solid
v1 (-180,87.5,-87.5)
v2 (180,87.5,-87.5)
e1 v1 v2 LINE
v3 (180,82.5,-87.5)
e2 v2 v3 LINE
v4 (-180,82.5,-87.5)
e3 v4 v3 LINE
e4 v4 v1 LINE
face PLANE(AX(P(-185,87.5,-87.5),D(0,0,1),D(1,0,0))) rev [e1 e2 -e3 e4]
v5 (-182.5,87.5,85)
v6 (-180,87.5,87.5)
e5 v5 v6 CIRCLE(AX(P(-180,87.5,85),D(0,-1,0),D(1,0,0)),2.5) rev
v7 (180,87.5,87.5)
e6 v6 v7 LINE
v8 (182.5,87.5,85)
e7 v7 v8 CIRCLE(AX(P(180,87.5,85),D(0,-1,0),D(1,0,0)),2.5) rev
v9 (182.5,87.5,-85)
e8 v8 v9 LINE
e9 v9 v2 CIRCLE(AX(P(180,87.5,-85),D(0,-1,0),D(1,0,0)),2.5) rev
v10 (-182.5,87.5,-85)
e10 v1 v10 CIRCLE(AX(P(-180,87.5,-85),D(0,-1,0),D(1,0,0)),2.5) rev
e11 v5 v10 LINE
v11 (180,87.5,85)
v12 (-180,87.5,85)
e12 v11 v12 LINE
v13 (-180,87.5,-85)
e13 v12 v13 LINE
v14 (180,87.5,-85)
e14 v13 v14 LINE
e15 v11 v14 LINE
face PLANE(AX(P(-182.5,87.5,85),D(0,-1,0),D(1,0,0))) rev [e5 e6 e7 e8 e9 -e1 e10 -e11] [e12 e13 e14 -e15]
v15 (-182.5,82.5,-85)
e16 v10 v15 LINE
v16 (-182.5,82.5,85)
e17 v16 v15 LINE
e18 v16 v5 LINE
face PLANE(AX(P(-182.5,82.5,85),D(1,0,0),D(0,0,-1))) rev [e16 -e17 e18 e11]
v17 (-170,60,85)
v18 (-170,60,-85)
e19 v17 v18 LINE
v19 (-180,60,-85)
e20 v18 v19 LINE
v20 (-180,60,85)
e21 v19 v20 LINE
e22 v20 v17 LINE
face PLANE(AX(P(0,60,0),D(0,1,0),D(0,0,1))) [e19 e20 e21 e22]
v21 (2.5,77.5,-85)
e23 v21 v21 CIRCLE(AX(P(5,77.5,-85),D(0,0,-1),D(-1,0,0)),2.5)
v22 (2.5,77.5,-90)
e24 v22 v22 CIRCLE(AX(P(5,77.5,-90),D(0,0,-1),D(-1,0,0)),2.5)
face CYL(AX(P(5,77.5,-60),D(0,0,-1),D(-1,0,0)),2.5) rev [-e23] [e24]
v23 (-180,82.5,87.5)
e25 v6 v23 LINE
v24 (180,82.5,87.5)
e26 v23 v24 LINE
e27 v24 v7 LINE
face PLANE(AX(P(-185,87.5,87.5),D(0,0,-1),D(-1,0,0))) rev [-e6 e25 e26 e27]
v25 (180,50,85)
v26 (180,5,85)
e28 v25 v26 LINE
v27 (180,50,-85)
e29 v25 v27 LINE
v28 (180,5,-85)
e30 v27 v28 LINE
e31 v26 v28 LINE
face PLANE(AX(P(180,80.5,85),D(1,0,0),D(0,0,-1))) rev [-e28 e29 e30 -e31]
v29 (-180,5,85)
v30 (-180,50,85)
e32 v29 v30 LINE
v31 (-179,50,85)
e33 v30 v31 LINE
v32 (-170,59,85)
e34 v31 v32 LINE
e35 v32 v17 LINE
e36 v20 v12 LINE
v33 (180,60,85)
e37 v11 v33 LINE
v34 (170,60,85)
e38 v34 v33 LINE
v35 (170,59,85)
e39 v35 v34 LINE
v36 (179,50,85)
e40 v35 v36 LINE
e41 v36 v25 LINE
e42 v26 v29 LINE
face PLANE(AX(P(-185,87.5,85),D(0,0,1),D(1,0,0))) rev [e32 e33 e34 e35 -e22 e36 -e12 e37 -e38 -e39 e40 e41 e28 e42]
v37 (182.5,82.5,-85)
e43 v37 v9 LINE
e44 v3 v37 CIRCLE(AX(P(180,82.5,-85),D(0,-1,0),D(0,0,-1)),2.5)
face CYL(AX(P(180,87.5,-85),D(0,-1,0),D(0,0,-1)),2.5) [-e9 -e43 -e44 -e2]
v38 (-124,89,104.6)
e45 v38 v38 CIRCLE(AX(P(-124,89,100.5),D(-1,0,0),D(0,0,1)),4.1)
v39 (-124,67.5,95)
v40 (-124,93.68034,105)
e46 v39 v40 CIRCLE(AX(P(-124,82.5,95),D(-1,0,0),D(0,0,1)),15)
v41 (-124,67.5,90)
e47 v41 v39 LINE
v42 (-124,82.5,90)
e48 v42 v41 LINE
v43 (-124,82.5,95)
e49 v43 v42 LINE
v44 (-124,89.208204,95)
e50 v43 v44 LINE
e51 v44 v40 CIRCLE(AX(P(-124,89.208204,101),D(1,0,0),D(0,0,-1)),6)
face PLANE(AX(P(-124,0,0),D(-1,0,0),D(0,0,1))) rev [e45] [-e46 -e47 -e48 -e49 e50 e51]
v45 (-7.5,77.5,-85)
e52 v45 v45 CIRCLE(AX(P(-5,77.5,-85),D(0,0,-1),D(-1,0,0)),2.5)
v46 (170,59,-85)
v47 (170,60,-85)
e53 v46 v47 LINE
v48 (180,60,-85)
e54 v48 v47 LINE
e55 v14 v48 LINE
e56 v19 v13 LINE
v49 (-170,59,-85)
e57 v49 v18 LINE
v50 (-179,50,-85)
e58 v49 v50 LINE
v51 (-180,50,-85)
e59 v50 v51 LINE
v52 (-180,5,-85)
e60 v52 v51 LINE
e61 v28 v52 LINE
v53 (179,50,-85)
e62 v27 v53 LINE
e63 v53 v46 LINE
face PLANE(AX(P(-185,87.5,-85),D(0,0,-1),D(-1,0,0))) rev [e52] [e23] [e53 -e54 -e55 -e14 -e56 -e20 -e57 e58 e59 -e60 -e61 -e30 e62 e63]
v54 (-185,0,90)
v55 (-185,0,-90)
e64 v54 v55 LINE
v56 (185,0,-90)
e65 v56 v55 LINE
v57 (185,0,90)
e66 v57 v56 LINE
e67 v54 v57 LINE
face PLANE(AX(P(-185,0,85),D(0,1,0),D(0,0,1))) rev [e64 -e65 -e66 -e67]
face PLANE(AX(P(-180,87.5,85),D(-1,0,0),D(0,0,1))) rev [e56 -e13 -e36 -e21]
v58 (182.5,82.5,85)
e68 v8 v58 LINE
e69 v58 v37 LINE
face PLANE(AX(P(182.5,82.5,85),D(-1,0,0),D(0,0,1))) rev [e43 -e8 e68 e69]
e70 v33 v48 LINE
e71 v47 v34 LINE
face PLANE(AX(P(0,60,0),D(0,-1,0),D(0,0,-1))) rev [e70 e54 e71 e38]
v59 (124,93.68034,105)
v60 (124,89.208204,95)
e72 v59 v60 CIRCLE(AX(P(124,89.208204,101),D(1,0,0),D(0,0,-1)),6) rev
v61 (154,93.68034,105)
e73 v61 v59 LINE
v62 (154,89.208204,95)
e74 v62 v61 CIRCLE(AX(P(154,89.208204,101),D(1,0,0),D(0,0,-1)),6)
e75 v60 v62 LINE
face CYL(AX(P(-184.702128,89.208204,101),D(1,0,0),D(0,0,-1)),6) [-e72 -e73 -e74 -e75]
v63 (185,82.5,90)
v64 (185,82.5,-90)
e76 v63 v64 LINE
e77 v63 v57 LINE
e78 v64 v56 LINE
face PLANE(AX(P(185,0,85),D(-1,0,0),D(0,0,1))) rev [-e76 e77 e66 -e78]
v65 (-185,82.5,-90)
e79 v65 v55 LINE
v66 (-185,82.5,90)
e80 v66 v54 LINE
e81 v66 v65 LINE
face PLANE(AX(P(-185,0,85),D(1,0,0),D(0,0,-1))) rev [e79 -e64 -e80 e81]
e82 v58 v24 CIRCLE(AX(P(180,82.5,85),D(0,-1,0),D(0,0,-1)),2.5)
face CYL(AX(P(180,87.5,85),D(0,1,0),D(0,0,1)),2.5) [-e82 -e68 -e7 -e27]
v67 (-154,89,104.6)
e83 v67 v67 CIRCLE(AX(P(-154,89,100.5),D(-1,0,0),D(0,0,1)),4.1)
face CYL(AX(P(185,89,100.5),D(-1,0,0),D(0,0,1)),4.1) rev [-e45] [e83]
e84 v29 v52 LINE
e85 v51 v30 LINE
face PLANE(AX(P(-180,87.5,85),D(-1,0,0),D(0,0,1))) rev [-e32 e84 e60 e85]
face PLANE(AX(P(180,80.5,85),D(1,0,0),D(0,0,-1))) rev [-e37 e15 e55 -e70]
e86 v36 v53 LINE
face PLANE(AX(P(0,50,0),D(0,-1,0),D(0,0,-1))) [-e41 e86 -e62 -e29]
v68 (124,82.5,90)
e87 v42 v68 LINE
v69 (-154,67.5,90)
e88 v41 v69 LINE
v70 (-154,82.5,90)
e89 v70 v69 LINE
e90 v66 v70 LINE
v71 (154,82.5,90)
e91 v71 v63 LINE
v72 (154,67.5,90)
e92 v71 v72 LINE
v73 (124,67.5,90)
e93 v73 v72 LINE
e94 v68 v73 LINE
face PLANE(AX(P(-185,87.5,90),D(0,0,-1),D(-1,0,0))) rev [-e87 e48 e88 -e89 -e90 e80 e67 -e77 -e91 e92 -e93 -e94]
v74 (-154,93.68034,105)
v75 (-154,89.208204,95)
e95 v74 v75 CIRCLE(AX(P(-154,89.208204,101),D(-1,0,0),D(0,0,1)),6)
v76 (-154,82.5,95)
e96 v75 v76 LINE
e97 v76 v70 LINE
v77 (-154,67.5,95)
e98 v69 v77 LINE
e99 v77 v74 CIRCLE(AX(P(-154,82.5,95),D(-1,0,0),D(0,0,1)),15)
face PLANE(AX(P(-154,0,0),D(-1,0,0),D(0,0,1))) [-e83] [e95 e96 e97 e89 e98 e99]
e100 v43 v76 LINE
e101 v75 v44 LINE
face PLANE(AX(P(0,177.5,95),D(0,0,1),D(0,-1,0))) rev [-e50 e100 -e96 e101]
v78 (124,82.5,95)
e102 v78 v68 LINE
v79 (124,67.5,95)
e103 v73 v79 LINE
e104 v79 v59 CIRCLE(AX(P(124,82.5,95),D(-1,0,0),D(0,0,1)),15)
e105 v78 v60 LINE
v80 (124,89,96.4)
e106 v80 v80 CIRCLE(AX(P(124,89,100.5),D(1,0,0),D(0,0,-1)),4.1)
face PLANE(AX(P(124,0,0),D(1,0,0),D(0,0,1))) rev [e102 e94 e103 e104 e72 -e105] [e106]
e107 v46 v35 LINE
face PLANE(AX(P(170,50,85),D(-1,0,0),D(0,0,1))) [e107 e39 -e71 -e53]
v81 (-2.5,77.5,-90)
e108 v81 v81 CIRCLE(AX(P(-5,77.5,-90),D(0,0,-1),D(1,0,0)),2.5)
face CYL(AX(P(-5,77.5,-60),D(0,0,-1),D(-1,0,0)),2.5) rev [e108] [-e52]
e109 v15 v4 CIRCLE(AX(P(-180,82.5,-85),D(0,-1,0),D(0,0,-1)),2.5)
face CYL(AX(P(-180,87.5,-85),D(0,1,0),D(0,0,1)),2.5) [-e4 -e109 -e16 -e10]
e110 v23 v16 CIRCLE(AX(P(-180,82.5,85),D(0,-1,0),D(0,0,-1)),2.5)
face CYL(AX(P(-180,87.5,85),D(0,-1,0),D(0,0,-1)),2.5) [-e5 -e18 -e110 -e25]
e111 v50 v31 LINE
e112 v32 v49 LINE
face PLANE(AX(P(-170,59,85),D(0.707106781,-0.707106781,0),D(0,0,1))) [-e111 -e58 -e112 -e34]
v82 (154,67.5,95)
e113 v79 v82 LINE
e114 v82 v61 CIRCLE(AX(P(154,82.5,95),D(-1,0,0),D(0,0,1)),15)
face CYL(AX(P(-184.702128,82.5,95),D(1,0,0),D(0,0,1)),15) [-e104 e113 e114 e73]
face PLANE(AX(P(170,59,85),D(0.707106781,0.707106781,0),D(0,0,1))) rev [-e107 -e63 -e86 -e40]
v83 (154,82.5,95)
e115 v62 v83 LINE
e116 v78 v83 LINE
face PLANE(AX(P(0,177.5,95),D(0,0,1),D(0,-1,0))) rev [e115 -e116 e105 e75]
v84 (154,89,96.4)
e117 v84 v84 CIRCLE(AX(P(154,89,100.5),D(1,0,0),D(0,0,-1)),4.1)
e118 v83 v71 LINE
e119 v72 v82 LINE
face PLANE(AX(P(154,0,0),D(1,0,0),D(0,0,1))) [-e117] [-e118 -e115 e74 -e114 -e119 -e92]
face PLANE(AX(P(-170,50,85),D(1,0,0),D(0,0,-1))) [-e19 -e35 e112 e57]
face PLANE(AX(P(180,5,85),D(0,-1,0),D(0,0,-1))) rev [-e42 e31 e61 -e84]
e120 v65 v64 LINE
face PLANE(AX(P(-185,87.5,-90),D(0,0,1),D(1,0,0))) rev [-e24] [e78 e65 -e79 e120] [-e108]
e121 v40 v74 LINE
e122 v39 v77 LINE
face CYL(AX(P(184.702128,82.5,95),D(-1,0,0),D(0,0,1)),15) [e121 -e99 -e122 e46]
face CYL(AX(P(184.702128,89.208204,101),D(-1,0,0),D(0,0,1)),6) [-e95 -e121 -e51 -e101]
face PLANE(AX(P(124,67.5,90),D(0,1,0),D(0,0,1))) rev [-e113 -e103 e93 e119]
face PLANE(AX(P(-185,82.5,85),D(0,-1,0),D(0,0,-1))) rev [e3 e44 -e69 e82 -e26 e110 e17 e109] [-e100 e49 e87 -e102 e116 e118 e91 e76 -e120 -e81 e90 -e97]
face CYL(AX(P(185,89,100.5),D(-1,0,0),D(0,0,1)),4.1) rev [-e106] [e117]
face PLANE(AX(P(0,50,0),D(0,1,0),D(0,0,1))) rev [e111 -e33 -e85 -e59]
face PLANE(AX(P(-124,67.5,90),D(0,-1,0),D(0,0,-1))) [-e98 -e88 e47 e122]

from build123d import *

# Parameters (mm, degrees)
BOSS_EXTRUDE1_DEPTH     = 85
SKETCH3_W               = 370
SKETCH3_H               = 5
BOSS_EXTRUDE2_DEPTH     = 87.5
SKETCH4_W               = 2.5
SKETCH4_H               = 5
CUT_EXTRUDE1_DEPTH      = 391.712490202
CUT_EXTRUDE2_DEPTH      = 271.90127353
CUT_EXTRUDE2_DEPTH_BACK = 271.90127353
SKETCH5_W               = 2.5
SKETCH5_H               = 5
FILLET1_R               = 2.5
SKETCH6_W               = 10
SKETCH6_H               = 170
BOSS_EXTRUDE3_DEPTH     = 10
FILLET2_SIZE            = 9
SKETCH8_W               = 30
SKETCH8_H               = 15
REVOLVE1_ANGLE          = 180
FILLET9_R               = 6
SKETCH12_W              = 5
SKETCH12_H              = 15
BOSS_EXTRUDE5_DEPTH     = 30
SKETCH9_R               = 4.1
CUT_EXTRUDE4_DEPTH      = 370.495940438
FILLET11_R              = 6
SKETCH13_R              = 2.5
CUT_EXTRUDE5_DEPTH      = 30


with BuildPart() as part:
    # Sketch2 → Boss-Extrude1 (new, symmetric)
    with BuildSketch(Plane.XY):
        Polygon((-185, 0), (185, 0), (185, 82.5), (182.5, 82.5), (182.5, 87.5), (180, 87.5), (180, 80.5), (180, 5), (-180, 5), (-180, 80.5), (-180, 87.5), (-182.5, 87.5), (-182.5, 82.5), (-185, 82.5), align=None)
    extrude(amount=BOSS_EXTRUDE1_DEPTH, both=True)

    # Sketch3 → Boss-Extrude2 (add)
    with BuildSketch(Plane(origin=(0, 0, 0), x_dir=(1, 0, 0), z_dir=(0, 1, 0))):
        with Locations((0, -87.5)):
            Rectangle(SKETCH3_W, SKETCH3_H)
        with Locations((0, 87.5)):
            Rectangle(SKETCH3_W, SKETCH3_H)
    extrude(amount=BOSS_EXTRUDE2_DEPTH)

    # Sketch4 → Cut-Extrude1 (cut, through all)
    with BuildSketch(Plane(origin=(185, 0, 0), x_dir=(0, 0, -1), z_dir=(1, 0, 0))):
        with Locations((-88.75, 85)):
            Rectangle(SKETCH4_W, SKETCH4_H)
        with Locations((88.75, 85)):
            Rectangle(SKETCH4_W, SKETCH4_H)
    extrude(amount=-CUT_EXTRUDE1_DEPTH, mode=Mode.SUBTRACT)

    # Sketch5 → Cut-Extrude2 (cut, two sides: drawn at the far end of the back side and taken through both)
    with BuildSketch(Plane(origin=(0, 0, -87.5), x_dir=(-1, 0, 0), z_dir=(0, 0, -1)).offset(-CUT_EXTRUDE2_DEPTH_BACK)):
        with Locations((-183.75, 85)):
            Rectangle(SKETCH5_W, SKETCH5_H)
        with Locations((183.75, 85)):
            Rectangle(SKETCH5_W, SKETCH5_H)
    extrude(amount=CUT_EXTRUDE2_DEPTH + CUT_EXTRUDE2_DEPTH_BACK, mode=Mode.SUBTRACT)

    # Fillet1
    fillet1_edges = [part.edges().sort_by_distance(p)[0] for p in [
        (182.5, 85, 87.5),
        (182.5, 85, -87.5),
        (-182.5, 85, 87.5),
        (-182.5, 85, -87.5),
    ]]
    fillet(fillet1_edges, radius=FILLET1_R)

    # Sketch6 → Boss-Extrude3 (add)
    with BuildSketch(Plane(origin=(0, 60, 0), x_dir=(1, 0, 0), z_dir=(0, 1, 0))):
        with Locations((-175, 0)):
            Rectangle(SKETCH6_W, SKETCH6_H)
        with Locations((175, 0)):
            Rectangle(SKETCH6_W, SKETCH6_H)
    extrude(amount=-BOSS_EXTRUDE3_DEPTH)

    # Fillet2
    fillet2_edges = [part.edges().sort_by_distance(p)[0] for p in [
        (-170, 50, 0),
        (170, 50, 0),
    ]]
    chamfer(fillet2_edges, length=FILLET2_SIZE)



with BuildPart() as body_2:
    # Sketch8 → Revolve1 (revolve, symmetric)
    with BuildSketch(Plane(origin=(0, 82.5, 0), x_dir=(1, 0, 0), z_dir=(0, 1, 0))) as revolve1_sk:
        with Locations((-139, -102.5)):
            Rectangle(SKETCH8_W, SKETCH8_H)
    revolve1 = revolve(axis=Axis((184.702128339, 82.5, 95), (-1, 0, 0)), revolution_arc=REVOLVE1_ANGLE / 2)
    revolve1 = revolve1 + revolve(revolve1_sk.sketch, axis=Axis((184.702128339, 82.5, 95), (1, 0, 0)), revolution_arc=REVOLVE1_ANGLE / 2)

    # Fillet9
    fillet9_edges = [body_2.edges().sort_by_distance(p)[0] for p in [
        (-139, 97.5, 95),
    ]]
    fillet(fillet9_edges, radius=FILLET9_R)


with BuildPart() as part_1:
    add(part.part)

    add(body_2.part)  # Boss-Extrude5 merges body 2
    # Sketch12 → Boss-Extrude5 (add)
    with BuildSketch(Plane.ZY.offset(154)):
        with Locations((92.5, 75)):
            Rectangle(SKETCH12_W, SKETCH12_H)
    boss_extrude5 = extrude(amount=-BOSS_EXTRUDE5_DEPTH)

    # Mirror4: Boss-Extrude5 across plane
    add(boss_extrude5.mirror(Plane(origin=(0, 0, 0), x_dir=(0, 0, 1), z_dir=(1, 0, 0))))

    # Mirror5: Revolve1 across plane
    add(revolve1.mirror(Plane(origin=(0, 0, 0), x_dir=(0, 0, 1), z_dir=(1, 0, 0))))

    # Sketch9 → Cut-Extrude4 (cut, through all)
    with BuildSketch(Plane.ZY.offset(154)):
        with Locations(Location((100.5, 89, 0), (0, 0, 180))):
            Circle(SKETCH9_R)
    extrude(amount=-CUT_EXTRUDE4_DEPTH, mode=Mode.SUBTRACT)

    # Fillet11
    fillet11_edges = [part_1.edges().sort_by_distance(p)[0] for p in [
        (139, 97.5, 95),
    ]]
    fillet(fillet11_edges, radius=FILLET11_R)

    # Sketch13 → Cut-Extrude5 (cut)
    with BuildSketch(Plane(origin=(0, 0, -90), x_dir=(-1, 0, 0), z_dir=(0, 0, -1))):
        with Locations((-5, 77.5)):
            Circle(SKETCH13_R)
        with Locations((5, 77.5)):
            Circle(SKETCH13_R)
    extrude(amount=-CUT_EXTRUDE5_DEPTH, mode=Mode.SUBTRACT)


solid = part_1.part
